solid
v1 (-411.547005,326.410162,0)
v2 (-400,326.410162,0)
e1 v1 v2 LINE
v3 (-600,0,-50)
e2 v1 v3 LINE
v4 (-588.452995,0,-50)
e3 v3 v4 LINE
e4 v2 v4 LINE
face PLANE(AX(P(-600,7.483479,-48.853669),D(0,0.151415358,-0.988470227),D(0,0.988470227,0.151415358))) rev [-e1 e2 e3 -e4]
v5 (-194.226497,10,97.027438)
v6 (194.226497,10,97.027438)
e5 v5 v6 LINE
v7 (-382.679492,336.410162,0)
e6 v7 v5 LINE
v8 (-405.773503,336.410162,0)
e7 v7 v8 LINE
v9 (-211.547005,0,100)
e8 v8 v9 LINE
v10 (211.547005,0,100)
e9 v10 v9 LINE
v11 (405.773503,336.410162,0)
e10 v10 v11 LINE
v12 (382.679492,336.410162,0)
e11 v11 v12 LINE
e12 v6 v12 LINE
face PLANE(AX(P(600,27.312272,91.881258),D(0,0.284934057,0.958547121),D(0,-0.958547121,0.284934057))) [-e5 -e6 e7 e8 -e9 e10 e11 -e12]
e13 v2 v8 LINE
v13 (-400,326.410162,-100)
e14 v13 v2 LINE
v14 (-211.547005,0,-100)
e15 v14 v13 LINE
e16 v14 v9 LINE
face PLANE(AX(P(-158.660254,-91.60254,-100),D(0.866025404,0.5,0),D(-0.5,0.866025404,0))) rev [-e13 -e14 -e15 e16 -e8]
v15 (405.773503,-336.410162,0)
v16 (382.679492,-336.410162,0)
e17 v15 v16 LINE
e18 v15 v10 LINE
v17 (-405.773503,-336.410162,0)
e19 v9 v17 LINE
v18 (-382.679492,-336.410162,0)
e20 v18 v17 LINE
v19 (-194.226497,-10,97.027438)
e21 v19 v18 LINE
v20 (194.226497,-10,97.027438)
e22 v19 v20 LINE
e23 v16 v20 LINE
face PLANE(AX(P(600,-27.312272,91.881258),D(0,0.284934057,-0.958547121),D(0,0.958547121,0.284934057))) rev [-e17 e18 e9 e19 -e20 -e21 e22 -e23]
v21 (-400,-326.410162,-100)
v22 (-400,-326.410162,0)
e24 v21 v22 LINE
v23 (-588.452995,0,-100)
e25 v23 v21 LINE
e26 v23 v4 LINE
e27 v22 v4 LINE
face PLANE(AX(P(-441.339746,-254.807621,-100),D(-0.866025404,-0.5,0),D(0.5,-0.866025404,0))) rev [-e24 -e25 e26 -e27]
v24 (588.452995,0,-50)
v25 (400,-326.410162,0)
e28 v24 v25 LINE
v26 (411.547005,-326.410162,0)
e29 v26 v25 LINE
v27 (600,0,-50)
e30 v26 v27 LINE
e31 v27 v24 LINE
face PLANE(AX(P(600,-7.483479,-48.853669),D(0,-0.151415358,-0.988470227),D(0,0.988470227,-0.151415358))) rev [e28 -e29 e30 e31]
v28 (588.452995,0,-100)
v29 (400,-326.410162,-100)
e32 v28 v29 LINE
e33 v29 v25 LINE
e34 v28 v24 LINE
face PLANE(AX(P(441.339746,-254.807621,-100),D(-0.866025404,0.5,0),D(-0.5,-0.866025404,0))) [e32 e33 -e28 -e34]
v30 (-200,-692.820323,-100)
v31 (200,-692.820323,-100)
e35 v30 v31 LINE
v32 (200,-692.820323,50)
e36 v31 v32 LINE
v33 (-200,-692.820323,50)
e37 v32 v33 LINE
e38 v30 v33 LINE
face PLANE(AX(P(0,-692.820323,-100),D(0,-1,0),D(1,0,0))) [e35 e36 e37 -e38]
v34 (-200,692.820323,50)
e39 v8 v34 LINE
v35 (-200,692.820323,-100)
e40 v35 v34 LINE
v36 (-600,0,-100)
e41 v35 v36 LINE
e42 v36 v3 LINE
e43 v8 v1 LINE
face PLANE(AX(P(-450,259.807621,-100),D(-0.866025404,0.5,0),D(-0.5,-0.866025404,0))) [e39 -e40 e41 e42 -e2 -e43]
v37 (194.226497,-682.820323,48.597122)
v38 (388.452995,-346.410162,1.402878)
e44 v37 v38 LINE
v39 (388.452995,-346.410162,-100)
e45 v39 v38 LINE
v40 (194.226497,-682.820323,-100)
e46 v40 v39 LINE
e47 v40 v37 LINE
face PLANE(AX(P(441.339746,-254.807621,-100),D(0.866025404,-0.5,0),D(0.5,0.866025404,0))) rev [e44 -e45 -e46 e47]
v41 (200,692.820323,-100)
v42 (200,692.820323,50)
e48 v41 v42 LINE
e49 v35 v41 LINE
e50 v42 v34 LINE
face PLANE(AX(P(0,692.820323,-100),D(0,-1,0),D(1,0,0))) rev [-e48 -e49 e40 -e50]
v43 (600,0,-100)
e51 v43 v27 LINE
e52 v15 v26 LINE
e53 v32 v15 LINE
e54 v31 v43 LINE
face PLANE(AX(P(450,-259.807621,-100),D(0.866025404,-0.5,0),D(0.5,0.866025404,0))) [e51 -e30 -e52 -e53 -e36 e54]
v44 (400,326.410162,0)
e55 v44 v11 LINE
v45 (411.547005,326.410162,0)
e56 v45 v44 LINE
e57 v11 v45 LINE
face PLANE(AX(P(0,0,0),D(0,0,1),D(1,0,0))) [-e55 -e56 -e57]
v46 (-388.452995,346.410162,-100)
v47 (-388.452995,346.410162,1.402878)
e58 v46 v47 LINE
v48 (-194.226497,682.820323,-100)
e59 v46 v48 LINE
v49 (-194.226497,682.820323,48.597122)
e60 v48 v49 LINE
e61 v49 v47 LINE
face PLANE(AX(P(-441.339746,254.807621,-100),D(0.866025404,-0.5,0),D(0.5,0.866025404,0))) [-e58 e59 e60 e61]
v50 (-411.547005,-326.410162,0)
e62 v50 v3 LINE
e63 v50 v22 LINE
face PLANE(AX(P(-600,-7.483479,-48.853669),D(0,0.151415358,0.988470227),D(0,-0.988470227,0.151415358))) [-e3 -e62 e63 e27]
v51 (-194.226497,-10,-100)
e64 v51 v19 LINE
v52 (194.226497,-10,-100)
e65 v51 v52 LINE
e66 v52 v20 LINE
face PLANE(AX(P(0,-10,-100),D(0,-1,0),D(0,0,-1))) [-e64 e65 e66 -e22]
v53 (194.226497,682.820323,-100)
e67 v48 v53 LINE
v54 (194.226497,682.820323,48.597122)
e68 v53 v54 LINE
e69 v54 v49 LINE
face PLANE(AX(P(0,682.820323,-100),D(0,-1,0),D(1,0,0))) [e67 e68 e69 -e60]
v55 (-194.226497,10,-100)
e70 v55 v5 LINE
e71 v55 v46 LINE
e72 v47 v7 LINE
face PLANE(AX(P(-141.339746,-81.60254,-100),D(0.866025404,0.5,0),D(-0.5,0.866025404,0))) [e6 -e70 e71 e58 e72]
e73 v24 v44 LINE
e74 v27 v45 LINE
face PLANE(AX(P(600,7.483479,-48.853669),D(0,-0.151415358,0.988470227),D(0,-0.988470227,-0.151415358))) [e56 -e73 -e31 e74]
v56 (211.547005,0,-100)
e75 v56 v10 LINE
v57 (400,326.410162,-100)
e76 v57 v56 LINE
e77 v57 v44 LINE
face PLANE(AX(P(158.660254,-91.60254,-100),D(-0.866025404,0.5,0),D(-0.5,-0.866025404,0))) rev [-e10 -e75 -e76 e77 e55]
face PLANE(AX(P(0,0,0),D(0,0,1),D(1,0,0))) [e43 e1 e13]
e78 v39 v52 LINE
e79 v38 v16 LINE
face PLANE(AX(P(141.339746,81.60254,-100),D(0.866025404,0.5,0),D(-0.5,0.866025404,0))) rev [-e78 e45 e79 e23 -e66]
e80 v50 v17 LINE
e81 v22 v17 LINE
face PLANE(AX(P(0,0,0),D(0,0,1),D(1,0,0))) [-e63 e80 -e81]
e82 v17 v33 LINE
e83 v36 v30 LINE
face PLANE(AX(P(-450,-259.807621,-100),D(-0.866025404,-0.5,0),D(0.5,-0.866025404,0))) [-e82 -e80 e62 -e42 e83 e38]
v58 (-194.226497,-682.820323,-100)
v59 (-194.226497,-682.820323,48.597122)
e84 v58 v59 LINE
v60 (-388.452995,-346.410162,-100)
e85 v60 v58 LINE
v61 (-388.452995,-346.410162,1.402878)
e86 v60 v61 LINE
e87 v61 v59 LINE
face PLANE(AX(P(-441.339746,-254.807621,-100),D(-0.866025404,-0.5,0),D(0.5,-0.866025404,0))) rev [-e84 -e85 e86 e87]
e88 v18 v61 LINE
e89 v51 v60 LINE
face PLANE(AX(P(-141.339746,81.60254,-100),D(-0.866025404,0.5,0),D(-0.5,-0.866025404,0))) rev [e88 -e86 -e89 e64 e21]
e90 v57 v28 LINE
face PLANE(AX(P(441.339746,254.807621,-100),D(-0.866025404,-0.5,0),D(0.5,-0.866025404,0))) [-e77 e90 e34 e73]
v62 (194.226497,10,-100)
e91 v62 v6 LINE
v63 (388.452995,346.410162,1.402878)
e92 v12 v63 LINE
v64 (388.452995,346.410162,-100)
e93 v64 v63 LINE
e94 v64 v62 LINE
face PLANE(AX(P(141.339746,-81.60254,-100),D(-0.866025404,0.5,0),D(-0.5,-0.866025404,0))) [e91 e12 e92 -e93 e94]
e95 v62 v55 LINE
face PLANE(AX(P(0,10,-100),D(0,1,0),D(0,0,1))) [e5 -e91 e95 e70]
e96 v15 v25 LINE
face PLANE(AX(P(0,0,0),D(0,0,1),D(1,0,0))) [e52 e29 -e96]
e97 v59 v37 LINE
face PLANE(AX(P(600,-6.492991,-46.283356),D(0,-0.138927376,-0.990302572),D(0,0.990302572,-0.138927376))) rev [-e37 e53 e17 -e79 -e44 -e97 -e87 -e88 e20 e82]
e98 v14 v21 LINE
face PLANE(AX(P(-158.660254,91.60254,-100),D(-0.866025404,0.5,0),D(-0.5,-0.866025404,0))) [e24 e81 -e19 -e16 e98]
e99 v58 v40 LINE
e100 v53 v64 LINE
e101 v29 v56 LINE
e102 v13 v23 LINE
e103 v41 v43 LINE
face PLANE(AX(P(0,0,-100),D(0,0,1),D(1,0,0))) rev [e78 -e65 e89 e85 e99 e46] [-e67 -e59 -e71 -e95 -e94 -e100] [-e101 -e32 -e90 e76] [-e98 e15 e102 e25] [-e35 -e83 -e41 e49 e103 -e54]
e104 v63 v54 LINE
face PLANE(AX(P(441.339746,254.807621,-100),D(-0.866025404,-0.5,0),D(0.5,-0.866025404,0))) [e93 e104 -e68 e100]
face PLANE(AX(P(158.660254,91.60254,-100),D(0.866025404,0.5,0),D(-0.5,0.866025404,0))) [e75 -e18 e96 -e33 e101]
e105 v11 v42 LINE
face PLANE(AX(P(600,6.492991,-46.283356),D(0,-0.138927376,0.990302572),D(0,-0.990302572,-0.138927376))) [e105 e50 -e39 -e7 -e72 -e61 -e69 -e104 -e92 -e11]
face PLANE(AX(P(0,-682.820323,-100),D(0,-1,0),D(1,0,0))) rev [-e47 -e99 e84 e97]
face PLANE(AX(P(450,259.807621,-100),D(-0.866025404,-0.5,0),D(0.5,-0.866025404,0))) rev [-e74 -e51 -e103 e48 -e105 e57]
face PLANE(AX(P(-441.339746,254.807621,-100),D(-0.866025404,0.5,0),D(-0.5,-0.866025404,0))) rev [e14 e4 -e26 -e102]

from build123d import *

# Parameters (mm, degrees)
EXTRUDE_1_DEPTH     = 100
EXTRUDE_2_DEPTH     = 100
EXTRUDE_3_DEPTH     = 100
EXTRUDE_START       = -100
EXTRUDE_4_DEPTH     = 100
CUT_EXTRUDE_1_DEPTH = 1221.655561574
EXTRUDE_1_2_DEPTH   = 100
CUT_EXTRUDE_2_DEPTH = 1226.38987213


# Read off the part's stored shape, not the designer's step: 拉伸-薄壁4
with BuildPart() as part:
    # 草图1 → Extrude 1 (new body)
    with BuildSketch(Plane.XY):
        Polygon((-600, 0), (-400, 346.410161514), (-200, 0), (-400, -346.410161514), align=None)
        Polygon((-588.452994616, 0), (-400, 326.410161514), (-211.547005384, 0), (-400, -326.410161514), align=None, mode=Mode.SUBTRACT)
    extrude(amount=-EXTRUDE_1_DEPTH)

    # 草图1<4> → 拉伸-薄壁2 (add)
    with BuildSketch(Plane.XY):
        Polygon((400, -346.410161514), (200, -692.820323028), (-200, -692.820323028), (-400, -346.410161514), (-200, 0), (0, 0), (200, 0), align=None)
        Polygon((388.452994616, -346.410161514), (194.226497308, -682.820323028), (-194.226497308, -682.820323028), (-388.452994616, -346.410161514), (-194.226497308, -10), (0, -10), (194.226497308, -10), align=None, mode=Mode.SUBTRACT)
    extrude(amount=-EXTRUDE_2_DEPTH)

    # 草图1<5> → 拉伸-薄壁3 (add)
    with BuildSketch(Plane.XY):
        Polygon((400, -346.410161514), (200, 0), (400, 346.410161514), (600, 0), align=None)
        Polygon((400, -326.410161514), (211.547005384, 0), (400, 326.410161514), (588.452994616, 0), align=None, mode=Mode.SUBTRACT)
    extrude(amount=-EXTRUDE_3_DEPTH)

    # 拉伸-薄壁4 outline → 拉伸-薄壁4 (add)
    with BuildSketch(Plane.XY.offset(EXTRUDE_START)):
        Polygon((200, 692.820323028), (-200, 692.820323028), (-400, 346.410161514), (-200, 0), (200, 0), (400, 346.410161514), align=None)
        Polygon((-194.226497308, 10), (-388.452994616, 346.410161514), (-194.226497308, 682.820323028), (194.226497308, 682.820323028), (388.452994616, 346.410161514), (194.226497308, 10), align=None, mode=Mode.SUBTRACT)
    extrude(amount=EXTRUDE_4_DEPTH)

    # 草图4 → 切除-拉伸1 (cut, through all)
    with BuildSketch(Plane(origin=(-400, 0, 0), x_dir=(0, 0, -1), z_dir=(1, 0, 0))):
        Polygon((50, 0), (0, -326.410161514), (0, 0), (0, 326.410161514), align=None)
    cut_extrude_1 = extrude(amount=-CUT_EXTRUDE_1_DEPTH, mode=Mode.SUBTRACT)

    # 镜向1: 切除-拉伸1 across plane
    add(cut_extrude_1.mirror(Plane(origin=(0, 0, 0), x_dir=(0, 0, 1), z_dir=(1, 0, 0))), mode=Mode.SUBTRACT)

    # 草图2 → Extrude 1 2 (add)
    with BuildSketch(Plane.XY):
        Polygon((388.452994616, 346.410161514), (400, 326.410161514), (405.773502692, 336.410161514), (200, 692.820323028), (-200, 692.820323028), (-405.773502692, 336.410161514), (-400, 326.410161514), (-388.452994616, 346.410161514), (-194.226497308, 682.820323028), (194.226497308, 682.820323028), align=None)
        Polygon((-400, -326.410161514), (-388.452994616, -346.410161514), (-194.226497308, -10), (194.226497308, -10), (388.452994616, -346.410161514), (400, -326.410161514), (211.547005384, 0), (400, 326.410161514), (388.452994616, 346.410161514), (194.226497308, 10), (-194.226497308, 10), (-388.452994616, 346.410161514), (-400, 326.410161514), (-211.547005384, 0), align=None)
        Polygon((405.773502692, -336.410161514), (400, -326.410161514), (388.452994616, -346.410161514), (194.226497308, -682.820323028), (-194.226497308, -682.820323028), (-388.452994616, -346.410161514), (-400, -326.410161514), (-405.773502692, -336.410161514), (-200, -692.820323028), (200, -692.820323028), align=None)
    extrude(amount=EXTRUDE_1_2_DEPTH)

    # 草图6 → 切除-拉伸2 (cut, through all)
    with BuildSketch(Plane.ZY.offset(405.773502692)):
        Polygon((100, 692.820323028), (100, 336.410161514), (0, 336.410161514), align=None)
        Polygon((100, 0), (0, 336.410161514), (100, 336.410161514), align=None)
        Polygon((100, 0), (100, -336.410161514), (0, -336.410161514), align=None)
        Polygon((100, -692.820323028), (0, -336.410161514), (100, -336.410161514), align=None)
        Polygon((50, -692.820323028), (100, -692.820323028), (50, -514.615242271), align=None)
        Polygon((50, -514.615242271), (0, -336.410161514), (50, -692.820323028), align=None)
        Polygon((50, -514.615242271), (50, -336.410161514), (0, -336.410161514), align=None)
        Polygon((50, 514.615242271), (0, 336.410161514), (50, 336.410161514), align=None)
        Polygon((50, 692.820323028), (0, 336.410161514), (50, 514.615242271), align=None)
        Polygon((50, 514.615242271), (100, 692.820323028), (50, 692.820323028), align=None)
    extrude(amount=-CUT_EXTRUDE_2_DEPTH, mode=Mode.SUBTRACT)


solid = part.part
